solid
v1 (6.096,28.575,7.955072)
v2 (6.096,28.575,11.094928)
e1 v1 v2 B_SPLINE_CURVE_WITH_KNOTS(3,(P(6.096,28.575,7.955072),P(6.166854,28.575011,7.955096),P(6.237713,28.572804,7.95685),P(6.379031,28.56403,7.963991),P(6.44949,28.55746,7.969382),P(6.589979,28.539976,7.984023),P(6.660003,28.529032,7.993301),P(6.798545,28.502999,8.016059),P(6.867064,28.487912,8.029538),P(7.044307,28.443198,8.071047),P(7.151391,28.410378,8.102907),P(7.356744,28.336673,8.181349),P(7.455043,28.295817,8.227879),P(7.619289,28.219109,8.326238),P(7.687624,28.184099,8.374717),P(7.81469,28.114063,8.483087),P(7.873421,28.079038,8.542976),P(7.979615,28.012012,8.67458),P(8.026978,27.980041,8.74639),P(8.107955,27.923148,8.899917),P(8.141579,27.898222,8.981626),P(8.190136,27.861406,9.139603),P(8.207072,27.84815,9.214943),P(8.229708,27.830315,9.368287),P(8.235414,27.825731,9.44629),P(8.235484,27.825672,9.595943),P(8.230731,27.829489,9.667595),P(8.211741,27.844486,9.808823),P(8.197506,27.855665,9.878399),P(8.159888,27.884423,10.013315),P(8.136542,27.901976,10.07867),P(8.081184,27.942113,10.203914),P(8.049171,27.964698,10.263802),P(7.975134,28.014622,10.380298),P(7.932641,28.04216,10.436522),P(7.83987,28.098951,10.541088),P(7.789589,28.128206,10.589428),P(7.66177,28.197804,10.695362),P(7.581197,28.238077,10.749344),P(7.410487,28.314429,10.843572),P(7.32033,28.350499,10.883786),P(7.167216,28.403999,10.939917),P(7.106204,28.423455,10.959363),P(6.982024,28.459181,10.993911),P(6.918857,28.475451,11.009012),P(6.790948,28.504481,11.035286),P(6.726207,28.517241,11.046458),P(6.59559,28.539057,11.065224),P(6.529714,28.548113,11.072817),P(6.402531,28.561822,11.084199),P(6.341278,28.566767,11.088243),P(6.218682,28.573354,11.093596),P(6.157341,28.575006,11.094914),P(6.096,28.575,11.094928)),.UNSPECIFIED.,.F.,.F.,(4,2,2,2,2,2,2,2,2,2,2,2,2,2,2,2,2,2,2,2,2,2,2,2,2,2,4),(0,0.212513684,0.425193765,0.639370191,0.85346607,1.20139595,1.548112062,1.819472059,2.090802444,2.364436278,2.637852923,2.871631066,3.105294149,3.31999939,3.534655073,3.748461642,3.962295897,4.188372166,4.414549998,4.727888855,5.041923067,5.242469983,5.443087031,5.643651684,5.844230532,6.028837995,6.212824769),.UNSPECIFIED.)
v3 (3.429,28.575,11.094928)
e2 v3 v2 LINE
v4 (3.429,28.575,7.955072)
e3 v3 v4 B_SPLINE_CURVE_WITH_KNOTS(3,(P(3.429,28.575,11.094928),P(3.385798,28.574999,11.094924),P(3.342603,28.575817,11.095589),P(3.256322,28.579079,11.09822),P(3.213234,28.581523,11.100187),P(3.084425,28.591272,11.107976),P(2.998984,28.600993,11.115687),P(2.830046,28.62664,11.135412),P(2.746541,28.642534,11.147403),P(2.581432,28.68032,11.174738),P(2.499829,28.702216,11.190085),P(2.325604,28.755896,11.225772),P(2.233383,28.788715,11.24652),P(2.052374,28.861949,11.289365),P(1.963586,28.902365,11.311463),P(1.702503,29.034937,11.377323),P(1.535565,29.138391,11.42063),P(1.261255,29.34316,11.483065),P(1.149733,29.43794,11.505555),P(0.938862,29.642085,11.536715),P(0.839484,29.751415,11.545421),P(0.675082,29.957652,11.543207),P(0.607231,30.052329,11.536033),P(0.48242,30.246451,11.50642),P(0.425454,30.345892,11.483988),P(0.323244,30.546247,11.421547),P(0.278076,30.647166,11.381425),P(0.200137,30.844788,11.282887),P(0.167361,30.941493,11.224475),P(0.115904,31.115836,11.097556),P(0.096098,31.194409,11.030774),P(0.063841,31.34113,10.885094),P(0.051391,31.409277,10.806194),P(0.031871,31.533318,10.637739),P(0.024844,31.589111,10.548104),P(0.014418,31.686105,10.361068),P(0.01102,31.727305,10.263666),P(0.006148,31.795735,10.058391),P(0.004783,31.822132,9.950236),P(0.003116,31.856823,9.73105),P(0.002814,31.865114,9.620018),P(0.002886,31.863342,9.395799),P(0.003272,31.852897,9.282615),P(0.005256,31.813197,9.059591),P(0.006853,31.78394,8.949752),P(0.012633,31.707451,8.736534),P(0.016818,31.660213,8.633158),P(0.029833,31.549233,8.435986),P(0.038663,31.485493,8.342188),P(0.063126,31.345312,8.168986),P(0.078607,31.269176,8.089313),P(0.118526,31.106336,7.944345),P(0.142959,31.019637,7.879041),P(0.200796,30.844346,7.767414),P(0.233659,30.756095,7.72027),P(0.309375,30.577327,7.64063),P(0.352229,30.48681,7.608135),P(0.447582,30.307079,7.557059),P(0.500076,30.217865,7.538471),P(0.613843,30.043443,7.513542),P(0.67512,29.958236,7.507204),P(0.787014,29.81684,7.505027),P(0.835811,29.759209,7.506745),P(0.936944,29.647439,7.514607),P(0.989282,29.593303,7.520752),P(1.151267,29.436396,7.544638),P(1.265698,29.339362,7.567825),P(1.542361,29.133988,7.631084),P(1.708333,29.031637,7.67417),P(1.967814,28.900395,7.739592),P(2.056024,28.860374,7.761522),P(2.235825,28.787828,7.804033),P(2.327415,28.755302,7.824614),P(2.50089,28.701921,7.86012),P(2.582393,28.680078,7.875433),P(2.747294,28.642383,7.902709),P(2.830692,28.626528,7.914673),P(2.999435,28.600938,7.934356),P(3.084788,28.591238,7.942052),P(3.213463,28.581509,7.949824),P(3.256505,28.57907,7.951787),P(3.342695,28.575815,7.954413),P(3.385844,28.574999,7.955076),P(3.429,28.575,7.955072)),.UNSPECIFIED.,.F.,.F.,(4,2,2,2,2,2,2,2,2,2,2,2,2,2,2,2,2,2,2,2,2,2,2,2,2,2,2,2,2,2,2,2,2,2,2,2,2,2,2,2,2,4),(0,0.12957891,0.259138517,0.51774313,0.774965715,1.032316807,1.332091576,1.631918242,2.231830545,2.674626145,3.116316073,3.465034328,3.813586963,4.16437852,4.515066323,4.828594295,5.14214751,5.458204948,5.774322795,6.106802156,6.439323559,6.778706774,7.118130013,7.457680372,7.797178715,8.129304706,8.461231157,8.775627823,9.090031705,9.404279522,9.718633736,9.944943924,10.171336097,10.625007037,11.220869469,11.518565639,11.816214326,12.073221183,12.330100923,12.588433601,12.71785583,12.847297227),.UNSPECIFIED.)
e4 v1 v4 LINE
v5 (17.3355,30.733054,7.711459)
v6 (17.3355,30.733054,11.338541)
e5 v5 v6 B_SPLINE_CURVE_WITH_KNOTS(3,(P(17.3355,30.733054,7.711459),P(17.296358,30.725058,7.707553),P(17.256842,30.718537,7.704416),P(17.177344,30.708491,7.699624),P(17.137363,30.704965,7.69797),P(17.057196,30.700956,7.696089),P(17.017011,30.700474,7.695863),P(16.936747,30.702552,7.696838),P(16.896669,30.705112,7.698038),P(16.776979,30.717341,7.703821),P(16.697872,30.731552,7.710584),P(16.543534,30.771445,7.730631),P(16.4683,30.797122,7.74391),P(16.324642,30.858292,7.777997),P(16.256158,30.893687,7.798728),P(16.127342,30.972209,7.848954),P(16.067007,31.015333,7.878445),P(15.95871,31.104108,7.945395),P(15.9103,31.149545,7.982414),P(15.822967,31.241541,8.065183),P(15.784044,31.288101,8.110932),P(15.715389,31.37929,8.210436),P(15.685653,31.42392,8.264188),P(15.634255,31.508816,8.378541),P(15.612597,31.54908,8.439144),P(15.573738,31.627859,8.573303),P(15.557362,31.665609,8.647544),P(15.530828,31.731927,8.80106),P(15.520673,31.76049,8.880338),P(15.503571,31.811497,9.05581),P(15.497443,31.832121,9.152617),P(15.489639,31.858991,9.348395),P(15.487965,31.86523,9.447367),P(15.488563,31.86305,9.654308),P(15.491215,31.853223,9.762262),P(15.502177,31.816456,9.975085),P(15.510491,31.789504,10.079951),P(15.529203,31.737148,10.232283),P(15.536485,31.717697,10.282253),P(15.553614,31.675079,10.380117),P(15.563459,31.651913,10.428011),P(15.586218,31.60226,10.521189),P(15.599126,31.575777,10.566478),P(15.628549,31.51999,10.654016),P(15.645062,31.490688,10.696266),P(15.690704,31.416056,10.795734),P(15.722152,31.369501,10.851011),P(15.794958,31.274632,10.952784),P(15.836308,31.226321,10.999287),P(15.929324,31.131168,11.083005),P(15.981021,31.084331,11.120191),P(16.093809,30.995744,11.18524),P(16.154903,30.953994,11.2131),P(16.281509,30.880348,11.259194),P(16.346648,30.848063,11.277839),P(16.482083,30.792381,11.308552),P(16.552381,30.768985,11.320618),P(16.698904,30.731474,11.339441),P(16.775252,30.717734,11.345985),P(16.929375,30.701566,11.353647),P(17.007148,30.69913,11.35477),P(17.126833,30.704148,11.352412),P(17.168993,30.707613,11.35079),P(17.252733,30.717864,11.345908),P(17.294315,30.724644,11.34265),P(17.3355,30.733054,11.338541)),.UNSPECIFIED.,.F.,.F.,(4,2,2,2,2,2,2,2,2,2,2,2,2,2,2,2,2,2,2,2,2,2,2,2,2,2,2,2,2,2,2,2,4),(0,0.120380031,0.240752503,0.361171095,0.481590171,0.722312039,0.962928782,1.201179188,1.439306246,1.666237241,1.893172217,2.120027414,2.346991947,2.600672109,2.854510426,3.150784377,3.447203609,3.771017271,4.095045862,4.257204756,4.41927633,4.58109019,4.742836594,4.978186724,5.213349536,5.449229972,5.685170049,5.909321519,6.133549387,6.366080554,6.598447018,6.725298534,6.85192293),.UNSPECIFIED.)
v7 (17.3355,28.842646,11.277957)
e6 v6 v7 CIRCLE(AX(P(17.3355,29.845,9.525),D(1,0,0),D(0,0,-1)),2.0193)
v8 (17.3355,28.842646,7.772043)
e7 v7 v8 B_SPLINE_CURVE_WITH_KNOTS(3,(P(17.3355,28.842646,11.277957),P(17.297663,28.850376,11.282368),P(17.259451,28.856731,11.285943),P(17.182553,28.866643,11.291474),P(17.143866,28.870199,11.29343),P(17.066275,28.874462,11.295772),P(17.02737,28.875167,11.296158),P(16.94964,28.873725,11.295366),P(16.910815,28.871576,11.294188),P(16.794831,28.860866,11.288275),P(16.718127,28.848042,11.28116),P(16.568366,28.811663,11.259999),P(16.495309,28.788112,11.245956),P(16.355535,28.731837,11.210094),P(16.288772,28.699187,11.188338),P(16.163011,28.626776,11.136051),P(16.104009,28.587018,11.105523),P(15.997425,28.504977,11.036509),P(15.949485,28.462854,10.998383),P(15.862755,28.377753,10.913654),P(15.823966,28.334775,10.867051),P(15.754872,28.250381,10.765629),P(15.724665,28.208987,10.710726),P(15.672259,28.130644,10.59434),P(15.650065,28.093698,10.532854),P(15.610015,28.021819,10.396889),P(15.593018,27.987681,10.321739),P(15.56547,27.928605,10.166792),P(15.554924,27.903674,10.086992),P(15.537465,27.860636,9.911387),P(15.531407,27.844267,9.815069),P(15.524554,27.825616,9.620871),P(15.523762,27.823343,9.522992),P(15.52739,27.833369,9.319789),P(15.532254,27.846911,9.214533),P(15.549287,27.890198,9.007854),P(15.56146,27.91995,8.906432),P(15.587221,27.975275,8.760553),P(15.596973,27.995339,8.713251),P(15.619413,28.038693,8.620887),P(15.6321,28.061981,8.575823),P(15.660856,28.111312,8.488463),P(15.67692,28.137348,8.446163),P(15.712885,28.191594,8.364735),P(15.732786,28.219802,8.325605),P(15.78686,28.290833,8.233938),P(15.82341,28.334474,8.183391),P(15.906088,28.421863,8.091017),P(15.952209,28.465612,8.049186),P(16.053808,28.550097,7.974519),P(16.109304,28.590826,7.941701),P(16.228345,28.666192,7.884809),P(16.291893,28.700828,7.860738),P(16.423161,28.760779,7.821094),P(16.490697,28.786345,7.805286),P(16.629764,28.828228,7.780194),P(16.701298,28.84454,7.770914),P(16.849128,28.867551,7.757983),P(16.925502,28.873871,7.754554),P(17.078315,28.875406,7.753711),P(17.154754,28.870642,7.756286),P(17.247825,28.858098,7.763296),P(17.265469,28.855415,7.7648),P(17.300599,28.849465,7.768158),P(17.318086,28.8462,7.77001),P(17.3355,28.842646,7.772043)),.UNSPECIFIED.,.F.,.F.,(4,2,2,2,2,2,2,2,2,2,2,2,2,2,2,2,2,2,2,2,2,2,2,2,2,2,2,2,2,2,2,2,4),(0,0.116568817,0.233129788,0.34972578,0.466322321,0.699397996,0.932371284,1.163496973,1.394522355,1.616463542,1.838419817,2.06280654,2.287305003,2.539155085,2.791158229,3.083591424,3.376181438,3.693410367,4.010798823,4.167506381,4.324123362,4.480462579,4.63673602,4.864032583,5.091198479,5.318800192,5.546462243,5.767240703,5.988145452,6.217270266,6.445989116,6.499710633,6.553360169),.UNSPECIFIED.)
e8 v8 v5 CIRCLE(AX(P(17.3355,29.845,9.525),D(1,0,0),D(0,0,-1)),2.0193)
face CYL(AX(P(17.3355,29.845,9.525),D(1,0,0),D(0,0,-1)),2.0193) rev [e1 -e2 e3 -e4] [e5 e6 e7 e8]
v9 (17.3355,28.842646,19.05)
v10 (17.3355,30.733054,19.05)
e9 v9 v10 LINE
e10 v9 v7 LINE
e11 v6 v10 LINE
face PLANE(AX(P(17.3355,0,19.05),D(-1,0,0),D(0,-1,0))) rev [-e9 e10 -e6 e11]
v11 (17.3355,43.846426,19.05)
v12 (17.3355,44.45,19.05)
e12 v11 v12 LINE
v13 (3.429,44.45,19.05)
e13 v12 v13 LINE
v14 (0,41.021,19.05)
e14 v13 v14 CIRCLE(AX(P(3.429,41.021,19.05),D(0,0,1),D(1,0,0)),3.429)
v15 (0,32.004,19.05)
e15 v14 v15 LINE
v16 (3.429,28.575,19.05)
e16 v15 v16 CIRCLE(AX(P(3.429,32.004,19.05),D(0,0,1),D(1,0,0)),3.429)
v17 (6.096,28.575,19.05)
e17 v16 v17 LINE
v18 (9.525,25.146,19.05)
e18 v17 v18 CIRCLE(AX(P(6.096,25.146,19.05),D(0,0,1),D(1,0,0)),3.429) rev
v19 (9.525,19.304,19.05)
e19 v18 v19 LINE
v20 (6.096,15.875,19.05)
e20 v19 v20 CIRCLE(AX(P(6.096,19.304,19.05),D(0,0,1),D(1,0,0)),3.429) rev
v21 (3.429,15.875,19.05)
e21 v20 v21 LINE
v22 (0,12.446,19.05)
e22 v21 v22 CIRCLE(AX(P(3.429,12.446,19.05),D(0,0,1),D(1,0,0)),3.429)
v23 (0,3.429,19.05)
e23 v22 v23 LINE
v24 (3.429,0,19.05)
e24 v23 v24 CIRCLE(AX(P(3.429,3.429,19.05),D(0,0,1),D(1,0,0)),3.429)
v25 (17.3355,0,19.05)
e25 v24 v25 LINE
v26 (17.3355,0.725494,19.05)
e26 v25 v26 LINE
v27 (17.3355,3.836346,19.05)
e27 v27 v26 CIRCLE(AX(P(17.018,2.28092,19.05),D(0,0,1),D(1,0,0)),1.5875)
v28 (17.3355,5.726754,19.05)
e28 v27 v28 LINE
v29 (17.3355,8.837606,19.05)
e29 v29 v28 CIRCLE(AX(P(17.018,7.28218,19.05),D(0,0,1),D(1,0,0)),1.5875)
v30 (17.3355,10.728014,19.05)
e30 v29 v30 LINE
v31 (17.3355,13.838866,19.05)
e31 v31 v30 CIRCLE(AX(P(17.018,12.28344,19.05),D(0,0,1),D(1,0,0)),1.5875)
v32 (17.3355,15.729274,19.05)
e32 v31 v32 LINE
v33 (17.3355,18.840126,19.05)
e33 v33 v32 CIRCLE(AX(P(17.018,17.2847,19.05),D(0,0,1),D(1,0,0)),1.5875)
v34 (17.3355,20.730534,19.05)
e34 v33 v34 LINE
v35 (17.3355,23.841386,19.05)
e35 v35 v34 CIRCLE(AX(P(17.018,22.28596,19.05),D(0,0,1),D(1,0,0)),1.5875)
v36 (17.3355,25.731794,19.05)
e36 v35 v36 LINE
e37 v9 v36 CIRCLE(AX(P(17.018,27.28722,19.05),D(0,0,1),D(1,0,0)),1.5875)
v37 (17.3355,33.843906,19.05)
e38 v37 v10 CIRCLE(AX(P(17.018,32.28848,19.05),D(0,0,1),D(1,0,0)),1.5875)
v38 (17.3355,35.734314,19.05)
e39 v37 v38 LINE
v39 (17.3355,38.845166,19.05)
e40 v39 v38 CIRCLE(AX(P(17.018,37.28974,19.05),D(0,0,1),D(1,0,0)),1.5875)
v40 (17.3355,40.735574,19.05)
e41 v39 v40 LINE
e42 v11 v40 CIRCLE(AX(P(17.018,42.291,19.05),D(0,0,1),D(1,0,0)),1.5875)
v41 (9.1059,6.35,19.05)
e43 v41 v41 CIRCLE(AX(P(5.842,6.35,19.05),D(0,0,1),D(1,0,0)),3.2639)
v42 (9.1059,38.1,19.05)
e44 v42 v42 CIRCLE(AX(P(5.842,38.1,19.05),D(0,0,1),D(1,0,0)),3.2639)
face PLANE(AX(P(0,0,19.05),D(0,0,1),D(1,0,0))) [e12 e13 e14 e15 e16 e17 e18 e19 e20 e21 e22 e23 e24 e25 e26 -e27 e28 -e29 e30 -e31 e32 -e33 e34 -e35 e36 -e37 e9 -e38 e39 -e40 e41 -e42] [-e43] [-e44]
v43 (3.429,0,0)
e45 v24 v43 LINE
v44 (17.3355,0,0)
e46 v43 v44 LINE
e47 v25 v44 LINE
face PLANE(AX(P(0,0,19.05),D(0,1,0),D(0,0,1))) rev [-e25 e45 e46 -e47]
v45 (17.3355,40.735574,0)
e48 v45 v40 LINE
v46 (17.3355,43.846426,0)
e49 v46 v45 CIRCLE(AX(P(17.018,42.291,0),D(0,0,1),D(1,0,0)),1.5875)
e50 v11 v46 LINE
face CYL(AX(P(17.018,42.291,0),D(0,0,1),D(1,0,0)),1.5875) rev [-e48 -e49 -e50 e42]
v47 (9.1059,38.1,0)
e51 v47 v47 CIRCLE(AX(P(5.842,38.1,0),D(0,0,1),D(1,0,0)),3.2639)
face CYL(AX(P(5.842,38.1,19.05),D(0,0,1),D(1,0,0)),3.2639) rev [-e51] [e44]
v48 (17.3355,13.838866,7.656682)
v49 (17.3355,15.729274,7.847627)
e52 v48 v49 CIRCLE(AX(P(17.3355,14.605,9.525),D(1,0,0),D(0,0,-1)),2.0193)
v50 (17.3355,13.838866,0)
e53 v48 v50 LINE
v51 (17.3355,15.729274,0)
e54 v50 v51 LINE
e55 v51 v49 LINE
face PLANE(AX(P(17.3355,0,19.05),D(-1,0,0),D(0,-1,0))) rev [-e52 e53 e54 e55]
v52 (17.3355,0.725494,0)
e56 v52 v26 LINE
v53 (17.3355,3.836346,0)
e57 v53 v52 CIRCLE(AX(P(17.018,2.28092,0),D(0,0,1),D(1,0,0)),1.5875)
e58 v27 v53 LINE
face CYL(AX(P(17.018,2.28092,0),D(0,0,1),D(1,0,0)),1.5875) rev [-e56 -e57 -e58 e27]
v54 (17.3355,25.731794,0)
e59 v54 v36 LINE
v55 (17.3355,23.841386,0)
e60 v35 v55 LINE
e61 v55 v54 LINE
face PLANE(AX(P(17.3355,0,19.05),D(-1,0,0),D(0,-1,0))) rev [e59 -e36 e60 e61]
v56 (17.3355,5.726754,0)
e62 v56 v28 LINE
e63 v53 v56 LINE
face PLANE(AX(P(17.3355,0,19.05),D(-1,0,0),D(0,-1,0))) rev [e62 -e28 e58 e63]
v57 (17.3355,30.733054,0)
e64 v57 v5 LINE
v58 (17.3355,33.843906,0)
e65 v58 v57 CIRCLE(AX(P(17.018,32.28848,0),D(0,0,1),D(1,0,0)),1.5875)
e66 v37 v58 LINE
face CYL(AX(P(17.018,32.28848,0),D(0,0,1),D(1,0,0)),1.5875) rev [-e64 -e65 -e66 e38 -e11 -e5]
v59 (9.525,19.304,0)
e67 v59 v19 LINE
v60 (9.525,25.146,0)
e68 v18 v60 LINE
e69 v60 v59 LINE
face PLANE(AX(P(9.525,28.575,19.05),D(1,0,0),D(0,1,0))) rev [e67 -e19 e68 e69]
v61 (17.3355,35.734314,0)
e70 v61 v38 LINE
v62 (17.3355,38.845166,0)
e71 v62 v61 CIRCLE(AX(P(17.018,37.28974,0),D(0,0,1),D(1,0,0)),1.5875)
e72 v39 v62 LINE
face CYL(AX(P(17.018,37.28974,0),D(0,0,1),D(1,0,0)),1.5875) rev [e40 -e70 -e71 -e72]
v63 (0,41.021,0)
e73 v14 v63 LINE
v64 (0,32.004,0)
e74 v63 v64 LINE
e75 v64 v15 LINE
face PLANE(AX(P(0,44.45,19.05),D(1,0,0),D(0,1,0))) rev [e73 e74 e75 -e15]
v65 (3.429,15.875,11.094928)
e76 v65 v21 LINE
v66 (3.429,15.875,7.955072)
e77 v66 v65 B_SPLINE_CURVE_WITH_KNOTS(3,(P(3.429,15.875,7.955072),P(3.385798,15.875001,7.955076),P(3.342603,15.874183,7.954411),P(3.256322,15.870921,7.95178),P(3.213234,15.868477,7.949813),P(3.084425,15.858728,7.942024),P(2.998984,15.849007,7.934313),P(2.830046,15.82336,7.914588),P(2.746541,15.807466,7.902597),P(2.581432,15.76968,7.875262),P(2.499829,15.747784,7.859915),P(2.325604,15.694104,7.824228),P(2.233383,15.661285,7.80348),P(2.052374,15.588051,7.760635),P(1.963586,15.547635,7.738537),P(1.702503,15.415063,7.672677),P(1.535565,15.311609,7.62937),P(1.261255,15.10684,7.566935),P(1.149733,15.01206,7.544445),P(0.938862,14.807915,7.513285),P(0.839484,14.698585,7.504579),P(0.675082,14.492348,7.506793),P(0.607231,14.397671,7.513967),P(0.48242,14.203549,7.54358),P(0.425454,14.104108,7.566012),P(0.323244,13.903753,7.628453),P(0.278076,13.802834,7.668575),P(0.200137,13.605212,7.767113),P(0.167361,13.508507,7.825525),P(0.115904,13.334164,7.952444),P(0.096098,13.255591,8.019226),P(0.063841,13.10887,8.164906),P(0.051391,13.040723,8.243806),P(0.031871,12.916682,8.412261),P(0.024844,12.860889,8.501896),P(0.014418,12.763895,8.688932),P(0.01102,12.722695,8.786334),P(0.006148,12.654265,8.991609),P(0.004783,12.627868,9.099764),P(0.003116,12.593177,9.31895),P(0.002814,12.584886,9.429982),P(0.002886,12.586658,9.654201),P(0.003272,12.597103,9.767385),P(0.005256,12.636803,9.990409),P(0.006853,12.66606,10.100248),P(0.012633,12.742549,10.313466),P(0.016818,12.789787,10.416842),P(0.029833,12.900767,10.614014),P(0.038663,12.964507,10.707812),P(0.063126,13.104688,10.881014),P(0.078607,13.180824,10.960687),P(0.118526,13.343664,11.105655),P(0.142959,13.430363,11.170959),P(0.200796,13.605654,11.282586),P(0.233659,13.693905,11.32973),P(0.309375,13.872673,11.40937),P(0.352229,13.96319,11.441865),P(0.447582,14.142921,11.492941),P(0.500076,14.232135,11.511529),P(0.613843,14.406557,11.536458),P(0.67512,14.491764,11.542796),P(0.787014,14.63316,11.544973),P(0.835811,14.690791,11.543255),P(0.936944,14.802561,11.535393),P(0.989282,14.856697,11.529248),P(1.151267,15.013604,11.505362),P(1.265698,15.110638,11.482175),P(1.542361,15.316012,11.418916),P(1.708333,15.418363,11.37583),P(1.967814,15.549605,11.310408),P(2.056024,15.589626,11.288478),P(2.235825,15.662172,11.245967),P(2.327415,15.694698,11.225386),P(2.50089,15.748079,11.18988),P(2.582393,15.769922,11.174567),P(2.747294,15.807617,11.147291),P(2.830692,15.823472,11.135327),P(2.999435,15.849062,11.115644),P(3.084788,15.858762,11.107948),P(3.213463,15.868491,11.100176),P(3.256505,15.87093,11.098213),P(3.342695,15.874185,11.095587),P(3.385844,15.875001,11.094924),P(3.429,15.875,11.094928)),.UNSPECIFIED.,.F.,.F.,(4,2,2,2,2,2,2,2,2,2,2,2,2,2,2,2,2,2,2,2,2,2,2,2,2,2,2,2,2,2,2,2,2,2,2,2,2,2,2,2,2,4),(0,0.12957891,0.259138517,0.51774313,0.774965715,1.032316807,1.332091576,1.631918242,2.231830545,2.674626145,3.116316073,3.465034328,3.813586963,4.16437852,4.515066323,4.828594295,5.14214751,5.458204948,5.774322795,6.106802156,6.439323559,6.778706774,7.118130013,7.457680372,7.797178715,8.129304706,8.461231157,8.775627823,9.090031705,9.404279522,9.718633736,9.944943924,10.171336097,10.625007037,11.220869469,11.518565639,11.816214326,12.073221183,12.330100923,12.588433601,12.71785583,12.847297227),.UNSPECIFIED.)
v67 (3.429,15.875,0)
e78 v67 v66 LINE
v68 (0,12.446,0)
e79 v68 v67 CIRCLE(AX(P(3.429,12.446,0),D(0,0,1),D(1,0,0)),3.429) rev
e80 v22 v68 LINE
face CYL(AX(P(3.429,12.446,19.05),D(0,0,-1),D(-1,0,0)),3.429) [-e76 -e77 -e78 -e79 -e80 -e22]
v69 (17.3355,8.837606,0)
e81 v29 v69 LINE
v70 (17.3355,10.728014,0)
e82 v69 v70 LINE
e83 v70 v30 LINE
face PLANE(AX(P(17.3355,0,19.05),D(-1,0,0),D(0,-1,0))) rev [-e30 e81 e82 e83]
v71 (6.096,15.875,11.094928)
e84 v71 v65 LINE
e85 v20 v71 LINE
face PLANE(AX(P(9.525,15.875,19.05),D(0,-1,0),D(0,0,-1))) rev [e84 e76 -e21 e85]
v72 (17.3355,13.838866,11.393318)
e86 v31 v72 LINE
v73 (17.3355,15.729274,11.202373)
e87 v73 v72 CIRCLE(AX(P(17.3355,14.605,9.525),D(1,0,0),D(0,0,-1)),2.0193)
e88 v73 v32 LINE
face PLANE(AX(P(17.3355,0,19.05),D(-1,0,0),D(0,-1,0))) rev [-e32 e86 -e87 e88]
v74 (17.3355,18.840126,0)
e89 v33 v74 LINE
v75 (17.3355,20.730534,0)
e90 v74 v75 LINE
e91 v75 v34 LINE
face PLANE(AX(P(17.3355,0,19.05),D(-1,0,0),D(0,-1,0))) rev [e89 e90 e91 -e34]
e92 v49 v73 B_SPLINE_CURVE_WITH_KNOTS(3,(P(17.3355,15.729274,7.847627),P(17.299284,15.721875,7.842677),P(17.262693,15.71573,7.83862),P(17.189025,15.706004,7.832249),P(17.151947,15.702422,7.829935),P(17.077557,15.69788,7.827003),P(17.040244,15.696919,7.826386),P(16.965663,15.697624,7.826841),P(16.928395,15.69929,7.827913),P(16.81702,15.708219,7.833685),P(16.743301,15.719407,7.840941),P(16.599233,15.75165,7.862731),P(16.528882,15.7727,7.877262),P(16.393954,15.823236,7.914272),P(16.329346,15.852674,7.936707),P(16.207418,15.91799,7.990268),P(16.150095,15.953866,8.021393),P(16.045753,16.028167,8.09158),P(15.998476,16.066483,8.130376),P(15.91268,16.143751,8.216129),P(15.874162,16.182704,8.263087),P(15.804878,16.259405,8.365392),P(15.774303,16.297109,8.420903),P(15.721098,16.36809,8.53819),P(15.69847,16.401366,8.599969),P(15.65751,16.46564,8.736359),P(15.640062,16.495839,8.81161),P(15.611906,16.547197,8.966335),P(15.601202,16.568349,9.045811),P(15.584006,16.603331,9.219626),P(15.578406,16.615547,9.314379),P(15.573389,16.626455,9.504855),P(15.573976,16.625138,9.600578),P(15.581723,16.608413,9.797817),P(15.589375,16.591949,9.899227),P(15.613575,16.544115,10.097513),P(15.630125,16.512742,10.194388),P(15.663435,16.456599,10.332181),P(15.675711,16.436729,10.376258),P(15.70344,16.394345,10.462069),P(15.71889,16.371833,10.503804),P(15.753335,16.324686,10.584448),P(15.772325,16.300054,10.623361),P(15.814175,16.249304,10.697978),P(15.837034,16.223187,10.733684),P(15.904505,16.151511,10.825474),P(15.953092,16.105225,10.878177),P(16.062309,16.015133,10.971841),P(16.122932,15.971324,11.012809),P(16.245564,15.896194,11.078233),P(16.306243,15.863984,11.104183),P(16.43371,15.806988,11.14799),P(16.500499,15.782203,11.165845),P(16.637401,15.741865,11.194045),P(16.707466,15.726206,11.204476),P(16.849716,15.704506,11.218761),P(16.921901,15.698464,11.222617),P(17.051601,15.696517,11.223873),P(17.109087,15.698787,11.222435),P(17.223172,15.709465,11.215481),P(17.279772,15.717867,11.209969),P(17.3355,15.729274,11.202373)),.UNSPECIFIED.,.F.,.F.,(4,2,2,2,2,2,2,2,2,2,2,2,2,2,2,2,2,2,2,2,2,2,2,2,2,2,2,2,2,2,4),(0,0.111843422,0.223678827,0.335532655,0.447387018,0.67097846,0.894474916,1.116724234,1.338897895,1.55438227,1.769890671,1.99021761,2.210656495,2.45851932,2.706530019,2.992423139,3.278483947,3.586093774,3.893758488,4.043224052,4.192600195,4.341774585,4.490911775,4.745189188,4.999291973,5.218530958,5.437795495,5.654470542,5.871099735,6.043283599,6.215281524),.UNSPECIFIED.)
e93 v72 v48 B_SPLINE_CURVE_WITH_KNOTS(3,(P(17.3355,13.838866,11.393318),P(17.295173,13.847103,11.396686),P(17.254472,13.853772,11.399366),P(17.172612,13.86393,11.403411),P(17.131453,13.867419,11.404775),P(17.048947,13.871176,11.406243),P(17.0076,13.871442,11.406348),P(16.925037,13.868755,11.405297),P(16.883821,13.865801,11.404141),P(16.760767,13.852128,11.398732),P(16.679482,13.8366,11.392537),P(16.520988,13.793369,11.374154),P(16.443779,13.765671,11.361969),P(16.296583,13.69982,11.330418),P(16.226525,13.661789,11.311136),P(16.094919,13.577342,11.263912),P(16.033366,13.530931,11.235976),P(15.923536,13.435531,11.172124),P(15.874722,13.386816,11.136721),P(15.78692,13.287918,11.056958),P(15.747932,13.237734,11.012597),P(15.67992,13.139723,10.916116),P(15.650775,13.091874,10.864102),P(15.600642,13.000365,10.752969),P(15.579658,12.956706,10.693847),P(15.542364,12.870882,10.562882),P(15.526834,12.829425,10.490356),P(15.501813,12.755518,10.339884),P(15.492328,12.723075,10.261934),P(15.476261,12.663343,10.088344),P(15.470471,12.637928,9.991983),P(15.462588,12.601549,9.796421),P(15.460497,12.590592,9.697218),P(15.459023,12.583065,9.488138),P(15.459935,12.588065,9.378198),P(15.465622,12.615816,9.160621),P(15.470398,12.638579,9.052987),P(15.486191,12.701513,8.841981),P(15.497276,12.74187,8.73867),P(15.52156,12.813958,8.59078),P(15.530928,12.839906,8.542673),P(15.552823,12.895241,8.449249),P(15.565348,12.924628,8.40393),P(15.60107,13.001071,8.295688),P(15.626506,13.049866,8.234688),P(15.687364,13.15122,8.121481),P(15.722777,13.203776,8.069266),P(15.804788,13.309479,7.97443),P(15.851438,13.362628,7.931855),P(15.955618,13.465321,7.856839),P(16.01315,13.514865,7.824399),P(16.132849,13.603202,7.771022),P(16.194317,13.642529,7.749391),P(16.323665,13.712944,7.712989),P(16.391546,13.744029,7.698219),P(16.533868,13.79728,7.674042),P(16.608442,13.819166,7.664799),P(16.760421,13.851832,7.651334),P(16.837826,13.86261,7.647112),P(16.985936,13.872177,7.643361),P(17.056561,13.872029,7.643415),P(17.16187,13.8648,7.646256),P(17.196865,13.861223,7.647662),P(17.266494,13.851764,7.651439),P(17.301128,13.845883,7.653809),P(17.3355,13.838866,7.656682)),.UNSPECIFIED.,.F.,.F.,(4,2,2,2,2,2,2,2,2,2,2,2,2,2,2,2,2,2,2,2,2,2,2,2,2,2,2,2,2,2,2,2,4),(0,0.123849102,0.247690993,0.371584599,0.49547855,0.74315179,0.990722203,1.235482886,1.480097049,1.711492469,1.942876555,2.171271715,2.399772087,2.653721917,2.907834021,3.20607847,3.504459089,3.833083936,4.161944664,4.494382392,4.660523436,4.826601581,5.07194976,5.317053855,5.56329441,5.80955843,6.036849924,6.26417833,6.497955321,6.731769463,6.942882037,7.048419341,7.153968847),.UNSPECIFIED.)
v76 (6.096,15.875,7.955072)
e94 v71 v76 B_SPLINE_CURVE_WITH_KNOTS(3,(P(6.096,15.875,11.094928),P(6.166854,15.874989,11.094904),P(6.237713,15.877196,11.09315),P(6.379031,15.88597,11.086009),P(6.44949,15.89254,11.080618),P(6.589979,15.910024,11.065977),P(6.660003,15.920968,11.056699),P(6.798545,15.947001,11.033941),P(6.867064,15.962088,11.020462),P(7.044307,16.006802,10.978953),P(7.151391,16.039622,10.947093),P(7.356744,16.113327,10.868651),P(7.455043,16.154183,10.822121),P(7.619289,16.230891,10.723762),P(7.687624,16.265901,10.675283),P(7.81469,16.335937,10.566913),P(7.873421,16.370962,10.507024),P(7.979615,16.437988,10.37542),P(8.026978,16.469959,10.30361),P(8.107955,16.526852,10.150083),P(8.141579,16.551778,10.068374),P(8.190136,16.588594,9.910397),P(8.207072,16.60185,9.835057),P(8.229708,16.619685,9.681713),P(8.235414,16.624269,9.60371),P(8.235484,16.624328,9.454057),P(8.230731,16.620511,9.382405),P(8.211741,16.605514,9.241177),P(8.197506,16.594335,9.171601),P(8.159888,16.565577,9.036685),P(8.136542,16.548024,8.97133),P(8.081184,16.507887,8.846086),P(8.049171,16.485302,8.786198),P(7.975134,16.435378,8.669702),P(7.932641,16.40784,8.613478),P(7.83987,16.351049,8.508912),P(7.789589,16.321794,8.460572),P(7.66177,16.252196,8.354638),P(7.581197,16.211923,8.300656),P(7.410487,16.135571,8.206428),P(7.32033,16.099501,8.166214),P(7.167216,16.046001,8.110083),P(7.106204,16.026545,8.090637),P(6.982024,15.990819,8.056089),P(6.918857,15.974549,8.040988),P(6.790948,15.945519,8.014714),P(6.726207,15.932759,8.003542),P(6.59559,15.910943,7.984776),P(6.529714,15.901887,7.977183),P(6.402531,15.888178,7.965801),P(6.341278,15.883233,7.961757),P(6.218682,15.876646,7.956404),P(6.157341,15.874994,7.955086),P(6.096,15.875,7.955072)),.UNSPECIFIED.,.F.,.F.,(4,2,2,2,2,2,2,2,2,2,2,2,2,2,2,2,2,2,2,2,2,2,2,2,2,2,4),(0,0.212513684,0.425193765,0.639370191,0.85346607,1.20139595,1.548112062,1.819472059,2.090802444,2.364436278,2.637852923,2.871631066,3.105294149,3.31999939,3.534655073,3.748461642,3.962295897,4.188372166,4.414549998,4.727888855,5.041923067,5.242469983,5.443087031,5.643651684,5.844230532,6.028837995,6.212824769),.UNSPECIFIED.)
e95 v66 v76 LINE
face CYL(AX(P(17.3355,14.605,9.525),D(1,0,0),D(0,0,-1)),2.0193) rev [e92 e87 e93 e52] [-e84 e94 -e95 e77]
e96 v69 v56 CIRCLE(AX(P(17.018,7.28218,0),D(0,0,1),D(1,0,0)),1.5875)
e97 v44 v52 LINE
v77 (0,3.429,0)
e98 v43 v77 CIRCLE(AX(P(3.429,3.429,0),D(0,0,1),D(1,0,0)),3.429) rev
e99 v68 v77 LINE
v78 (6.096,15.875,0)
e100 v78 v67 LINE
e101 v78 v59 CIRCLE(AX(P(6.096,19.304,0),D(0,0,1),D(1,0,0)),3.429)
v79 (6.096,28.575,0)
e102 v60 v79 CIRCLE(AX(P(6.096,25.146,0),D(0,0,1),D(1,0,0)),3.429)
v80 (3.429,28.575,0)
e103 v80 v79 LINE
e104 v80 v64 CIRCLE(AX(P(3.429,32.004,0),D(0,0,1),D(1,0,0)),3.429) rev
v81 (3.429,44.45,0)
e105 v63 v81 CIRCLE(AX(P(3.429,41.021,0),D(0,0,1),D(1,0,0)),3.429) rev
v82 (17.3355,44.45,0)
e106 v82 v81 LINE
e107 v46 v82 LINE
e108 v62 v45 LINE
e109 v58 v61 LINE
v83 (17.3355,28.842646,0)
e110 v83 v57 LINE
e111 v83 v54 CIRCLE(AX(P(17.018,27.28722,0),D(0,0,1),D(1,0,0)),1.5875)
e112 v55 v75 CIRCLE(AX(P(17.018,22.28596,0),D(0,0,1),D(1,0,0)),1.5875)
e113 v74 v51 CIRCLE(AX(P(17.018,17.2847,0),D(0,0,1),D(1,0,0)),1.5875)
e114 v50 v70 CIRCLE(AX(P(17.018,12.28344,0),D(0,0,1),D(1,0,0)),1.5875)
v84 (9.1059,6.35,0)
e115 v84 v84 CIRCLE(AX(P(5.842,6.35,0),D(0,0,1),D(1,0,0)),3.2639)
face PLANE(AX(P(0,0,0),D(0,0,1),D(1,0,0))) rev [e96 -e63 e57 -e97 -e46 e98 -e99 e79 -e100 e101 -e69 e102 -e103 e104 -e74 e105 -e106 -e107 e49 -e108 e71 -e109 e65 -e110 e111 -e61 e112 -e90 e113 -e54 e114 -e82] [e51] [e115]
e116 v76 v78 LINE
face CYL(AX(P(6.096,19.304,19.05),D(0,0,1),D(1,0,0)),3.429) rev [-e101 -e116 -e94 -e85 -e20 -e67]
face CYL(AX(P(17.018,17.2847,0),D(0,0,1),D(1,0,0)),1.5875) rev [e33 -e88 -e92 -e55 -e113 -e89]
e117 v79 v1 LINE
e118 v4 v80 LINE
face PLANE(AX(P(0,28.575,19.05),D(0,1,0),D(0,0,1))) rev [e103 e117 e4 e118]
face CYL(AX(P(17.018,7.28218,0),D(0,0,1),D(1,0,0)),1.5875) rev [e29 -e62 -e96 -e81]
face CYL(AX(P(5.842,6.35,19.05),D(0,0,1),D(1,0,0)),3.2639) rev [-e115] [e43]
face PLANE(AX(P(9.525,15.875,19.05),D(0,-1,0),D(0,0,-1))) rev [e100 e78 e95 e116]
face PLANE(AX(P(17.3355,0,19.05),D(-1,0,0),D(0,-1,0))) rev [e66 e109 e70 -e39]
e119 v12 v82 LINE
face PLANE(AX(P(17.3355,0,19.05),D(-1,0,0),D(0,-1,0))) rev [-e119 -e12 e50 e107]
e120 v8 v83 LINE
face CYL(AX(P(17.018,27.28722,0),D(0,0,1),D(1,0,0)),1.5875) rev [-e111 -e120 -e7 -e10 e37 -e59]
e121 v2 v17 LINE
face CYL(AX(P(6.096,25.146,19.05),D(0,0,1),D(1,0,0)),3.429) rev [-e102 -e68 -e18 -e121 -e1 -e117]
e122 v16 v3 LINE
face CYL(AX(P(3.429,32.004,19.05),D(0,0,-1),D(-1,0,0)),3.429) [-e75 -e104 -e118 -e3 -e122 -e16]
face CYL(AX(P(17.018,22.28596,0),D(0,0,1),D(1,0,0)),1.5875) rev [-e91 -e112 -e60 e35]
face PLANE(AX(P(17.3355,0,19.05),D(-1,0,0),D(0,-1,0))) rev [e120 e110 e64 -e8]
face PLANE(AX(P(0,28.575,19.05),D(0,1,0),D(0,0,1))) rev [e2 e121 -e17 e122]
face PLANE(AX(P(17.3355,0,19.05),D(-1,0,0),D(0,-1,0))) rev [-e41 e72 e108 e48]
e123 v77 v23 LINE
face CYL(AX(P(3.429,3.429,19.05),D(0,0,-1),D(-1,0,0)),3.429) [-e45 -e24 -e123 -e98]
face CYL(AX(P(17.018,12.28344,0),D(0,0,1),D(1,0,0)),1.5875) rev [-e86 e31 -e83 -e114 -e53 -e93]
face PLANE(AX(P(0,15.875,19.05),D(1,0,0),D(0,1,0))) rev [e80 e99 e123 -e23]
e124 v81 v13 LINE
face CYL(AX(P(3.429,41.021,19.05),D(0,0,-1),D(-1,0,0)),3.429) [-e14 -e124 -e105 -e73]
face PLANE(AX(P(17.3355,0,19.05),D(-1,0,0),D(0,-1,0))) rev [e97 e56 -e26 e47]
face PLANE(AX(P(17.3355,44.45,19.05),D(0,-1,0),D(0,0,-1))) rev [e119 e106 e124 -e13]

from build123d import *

# Parameters (mm, degrees)
BOSS_EXTRUDE1_DEPTH     = 19.05
F_1_4_CLEARANCE_HOLE1_D = 6.5278
F_10_32_TAPPED_HOLE1_D  = 4.0386
SKETCH6_R               = 1.5875
CUT_EXTRUDE1_DEPTH      = 52.373383773
LPATTERN1_COUNT         = 9
LPATTERN1_PITCH         = 5.00126
FILLET1_R               = 3.429


with BuildPart() as part:
    # Sketch1 → Boss-Extrude1 (new body)
    with BuildSketch(Plane.XY):
        Polygon((0, 0), (17.3355, 0), (17.3355, 44.45), (0, 44.45), (0, 28.575), (9.525, 28.575), (9.525, 15.875), (0, 15.875), align=None)
    extrude(amount=BOSS_EXTRUDE1_DEPTH)

    # 1/4 Clearance Hole1 (through all)
    with Locations(Plane.XY.offset(19.05)):
        with Locations((5.842, 38.1), (5.842, 6.35)):
            Hole(F_1_4_CLEARANCE_HOLE1_D / 2)

    # #10-32 Tapped Hole1 (through all)
    with Locations(Plane(origin=(17.3355, 0, 0), x_dir=(0, 0, -1), z_dir=(1, 0, 0))):
        with Locations((-9.525, 14.605), (-9.525, 29.845)):
            Hole(F_10_32_TAPPED_HOLE1_D / 2)

    # Sketch6 → Cut-Extrude1 (cut, symmetric)
    with BuildSketch(Plane.XY.offset(19.05)):
        with Locations((17.018, 2.28092)):
            Circle(SKETCH6_R)
    cut_extrude1 = extrude(amount=CUT_EXTRUDE1_DEPTH, both=True, mode=Mode.SUBTRACT)

    # LPattern1: Cut-Extrude1 ×9
    with Locations(*[(0, i * LPATTERN1_PITCH, 0) for i in range(1, LPATTERN1_COUNT)]):
        add(cut_extrude1, mode=Mode.SUBTRACT)

    # Fillet1
    # the kernel refuses this fillet: 3.429 mm, written as the material it adds along each edge
    with BuildSketch(Plane(origin=(9.525, 15.875, 2.522427543), x_dir=(-1, 0, 0), z_dir=(0, 0, 1))) as fillet1_piece_1_section:
        with BuildLine():
            CenterArc((FILLET1_R, -FILLET1_R), FILLET1_R, 90, 90)
            Line((0, -FILLET1_R), (0, 0))
            Line((0, 0), (FILLET1_R, 0))
        make_face()
    fillet1_piece_1 = extrude(amount=16.527572457, mode=Mode.PRIVATE)
    fillet1_piece_1 = fillet1_piece_1 - Plane(origin=(8.790805855, 14.605, 9.525), x_dir=(0, 0, 1), z_dir=(-1, 0, 0)) * Cylinder(2.0193, 47, mode=Mode.PRIVATE)
    add(fillet1_piece_1)
    with BuildSketch(Plane(origin=(9.525, 28.575, 2.522427543), x_dir=(0, -1, 0), z_dir=(0, 0, 1))) as fillet1_piece_2_section:
        with BuildLine():
            CenterArc((FILLET1_R, -FILLET1_R), FILLET1_R, 90, 90)
            Line((0, -FILLET1_R), (0, 0))
            Line((0, 0), (FILLET1_R, 0))
        make_face()
    fillet1_piece_2 = extrude(amount=16.527572457, mode=Mode.PRIVATE)
    fillet1_piece_2 = fillet1_piece_2 - Plane(origin=(8.790805812, 29.845, 9.525), x_dir=(0, 0, 1), z_dir=(-1, 0, 0)) * Cylinder(2.0193, 47, mode=Mode.PRIVATE)
    add(fillet1_piece_2)
    with BuildSketch(Plane(origin=(9.525, 15.875, 0), x_dir=(-1, 0, 0), z_dir=(0, 0, 1))) as fillet1_piece_3_section:
        with BuildLine():
            CenterArc((FILLET1_R, -FILLET1_R), FILLET1_R, 90, 90)
            Line((0, -FILLET1_R), (0, 0))
            Line((0, 0), (FILLET1_R, 0))
        make_face()
    fillet1_piece_3 = extrude(amount=16.527572457, mode=Mode.PRIVATE)
    fillet1_piece_3 = fillet1_piece_3 - Plane(origin=(8.790805857, 14.605, 9.525), x_dir=(0, 0, 1), z_dir=(-1, 0, 0)) * Cylinder(2.0193, 47, mode=Mode.PRIVATE)
    add(fillet1_piece_3)
    with BuildSketch(Plane(origin=(9.525, 28.575, 0), x_dir=(0, -1, 0), z_dir=(0, 0, 1))) as fillet1_piece_4_section:
        with BuildLine():
            CenterArc((FILLET1_R, -FILLET1_R), FILLET1_R, 90, 90)
            Line((0, -FILLET1_R), (0, 0))
            Line((0, 0), (FILLET1_R, 0))
        make_face()
    fillet1_piece_4 = extrude(amount=16.527572457, mode=Mode.PRIVATE)
    fillet1_piece_4 = fillet1_piece_4 - Plane(origin=(8.790805811, 29.845, 9.525), x_dir=(0, 0, 1), z_dir=(-1, 0, 0)) * Cylinder(2.0193, 47, mode=Mode.PRIVATE)
    add(fillet1_piece_4)
    # the kernel refuses this fillet: 3.429 mm, written as the material it takes off along each edge
    with BuildSketch(Plane(origin=(0, 15.875, 2.522427543), x_dir=(1, 0, 0), z_dir=(0, 0, 1)), Plane(origin=(0, 15.875, -8.5725), x_dir=(1, 0, 0), z_dir=(0, 0, 1))) as fillet1_2_piece_1:
        with BuildLine():
            CenterArc((FILLET1_R, -FILLET1_R), FILLET1_R, 90, 90)
            Line((0, -FILLET1_R), (0, 0))
            Line((0, 0), (FILLET1_R, 0))
        make_face()
    extrude(amount=25.100072457, mode=Mode.SUBTRACT)
    with BuildSketch(Plane(origin=(0, 28.575, 2.522427543), x_dir=(1, 0, 0), z_dir=(0, 0, 1)), Plane(origin=(0, 28.575, -8.5725), x_dir=(1, 0, 0), z_dir=(0, 0, 1))) as fillet1_2_piece_2:
        with BuildLine():
            CenterArc((FILLET1_R, FILLET1_R), FILLET1_R, 180, 90)
            Line((0, FILLET1_R), (0, 0))
            Line((0, 0), (FILLET1_R, 0))
        make_face()
    extrude(amount=25.100072457, mode=Mode.SUBTRACT)
    with BuildSketch(Plane(origin=(0, 44.45, -8.5725), x_dir=(0, -1, 0), z_dir=(0, 0, 1)), Plane(origin=(0, 0, -8.5725), x_dir=(1, 0, 0), z_dir=(0, 0, 1))) as fillet1_2_piece_3:
        with BuildLine():
            CenterArc((FILLET1_R, FILLET1_R), FILLET1_R, 180, 90)
            Line((0, FILLET1_R), (0, 0))
            Line((0, 0), (FILLET1_R, 0))
        make_face()
    extrude(amount=36.195, mode=Mode.SUBTRACT)


solid = part.part
